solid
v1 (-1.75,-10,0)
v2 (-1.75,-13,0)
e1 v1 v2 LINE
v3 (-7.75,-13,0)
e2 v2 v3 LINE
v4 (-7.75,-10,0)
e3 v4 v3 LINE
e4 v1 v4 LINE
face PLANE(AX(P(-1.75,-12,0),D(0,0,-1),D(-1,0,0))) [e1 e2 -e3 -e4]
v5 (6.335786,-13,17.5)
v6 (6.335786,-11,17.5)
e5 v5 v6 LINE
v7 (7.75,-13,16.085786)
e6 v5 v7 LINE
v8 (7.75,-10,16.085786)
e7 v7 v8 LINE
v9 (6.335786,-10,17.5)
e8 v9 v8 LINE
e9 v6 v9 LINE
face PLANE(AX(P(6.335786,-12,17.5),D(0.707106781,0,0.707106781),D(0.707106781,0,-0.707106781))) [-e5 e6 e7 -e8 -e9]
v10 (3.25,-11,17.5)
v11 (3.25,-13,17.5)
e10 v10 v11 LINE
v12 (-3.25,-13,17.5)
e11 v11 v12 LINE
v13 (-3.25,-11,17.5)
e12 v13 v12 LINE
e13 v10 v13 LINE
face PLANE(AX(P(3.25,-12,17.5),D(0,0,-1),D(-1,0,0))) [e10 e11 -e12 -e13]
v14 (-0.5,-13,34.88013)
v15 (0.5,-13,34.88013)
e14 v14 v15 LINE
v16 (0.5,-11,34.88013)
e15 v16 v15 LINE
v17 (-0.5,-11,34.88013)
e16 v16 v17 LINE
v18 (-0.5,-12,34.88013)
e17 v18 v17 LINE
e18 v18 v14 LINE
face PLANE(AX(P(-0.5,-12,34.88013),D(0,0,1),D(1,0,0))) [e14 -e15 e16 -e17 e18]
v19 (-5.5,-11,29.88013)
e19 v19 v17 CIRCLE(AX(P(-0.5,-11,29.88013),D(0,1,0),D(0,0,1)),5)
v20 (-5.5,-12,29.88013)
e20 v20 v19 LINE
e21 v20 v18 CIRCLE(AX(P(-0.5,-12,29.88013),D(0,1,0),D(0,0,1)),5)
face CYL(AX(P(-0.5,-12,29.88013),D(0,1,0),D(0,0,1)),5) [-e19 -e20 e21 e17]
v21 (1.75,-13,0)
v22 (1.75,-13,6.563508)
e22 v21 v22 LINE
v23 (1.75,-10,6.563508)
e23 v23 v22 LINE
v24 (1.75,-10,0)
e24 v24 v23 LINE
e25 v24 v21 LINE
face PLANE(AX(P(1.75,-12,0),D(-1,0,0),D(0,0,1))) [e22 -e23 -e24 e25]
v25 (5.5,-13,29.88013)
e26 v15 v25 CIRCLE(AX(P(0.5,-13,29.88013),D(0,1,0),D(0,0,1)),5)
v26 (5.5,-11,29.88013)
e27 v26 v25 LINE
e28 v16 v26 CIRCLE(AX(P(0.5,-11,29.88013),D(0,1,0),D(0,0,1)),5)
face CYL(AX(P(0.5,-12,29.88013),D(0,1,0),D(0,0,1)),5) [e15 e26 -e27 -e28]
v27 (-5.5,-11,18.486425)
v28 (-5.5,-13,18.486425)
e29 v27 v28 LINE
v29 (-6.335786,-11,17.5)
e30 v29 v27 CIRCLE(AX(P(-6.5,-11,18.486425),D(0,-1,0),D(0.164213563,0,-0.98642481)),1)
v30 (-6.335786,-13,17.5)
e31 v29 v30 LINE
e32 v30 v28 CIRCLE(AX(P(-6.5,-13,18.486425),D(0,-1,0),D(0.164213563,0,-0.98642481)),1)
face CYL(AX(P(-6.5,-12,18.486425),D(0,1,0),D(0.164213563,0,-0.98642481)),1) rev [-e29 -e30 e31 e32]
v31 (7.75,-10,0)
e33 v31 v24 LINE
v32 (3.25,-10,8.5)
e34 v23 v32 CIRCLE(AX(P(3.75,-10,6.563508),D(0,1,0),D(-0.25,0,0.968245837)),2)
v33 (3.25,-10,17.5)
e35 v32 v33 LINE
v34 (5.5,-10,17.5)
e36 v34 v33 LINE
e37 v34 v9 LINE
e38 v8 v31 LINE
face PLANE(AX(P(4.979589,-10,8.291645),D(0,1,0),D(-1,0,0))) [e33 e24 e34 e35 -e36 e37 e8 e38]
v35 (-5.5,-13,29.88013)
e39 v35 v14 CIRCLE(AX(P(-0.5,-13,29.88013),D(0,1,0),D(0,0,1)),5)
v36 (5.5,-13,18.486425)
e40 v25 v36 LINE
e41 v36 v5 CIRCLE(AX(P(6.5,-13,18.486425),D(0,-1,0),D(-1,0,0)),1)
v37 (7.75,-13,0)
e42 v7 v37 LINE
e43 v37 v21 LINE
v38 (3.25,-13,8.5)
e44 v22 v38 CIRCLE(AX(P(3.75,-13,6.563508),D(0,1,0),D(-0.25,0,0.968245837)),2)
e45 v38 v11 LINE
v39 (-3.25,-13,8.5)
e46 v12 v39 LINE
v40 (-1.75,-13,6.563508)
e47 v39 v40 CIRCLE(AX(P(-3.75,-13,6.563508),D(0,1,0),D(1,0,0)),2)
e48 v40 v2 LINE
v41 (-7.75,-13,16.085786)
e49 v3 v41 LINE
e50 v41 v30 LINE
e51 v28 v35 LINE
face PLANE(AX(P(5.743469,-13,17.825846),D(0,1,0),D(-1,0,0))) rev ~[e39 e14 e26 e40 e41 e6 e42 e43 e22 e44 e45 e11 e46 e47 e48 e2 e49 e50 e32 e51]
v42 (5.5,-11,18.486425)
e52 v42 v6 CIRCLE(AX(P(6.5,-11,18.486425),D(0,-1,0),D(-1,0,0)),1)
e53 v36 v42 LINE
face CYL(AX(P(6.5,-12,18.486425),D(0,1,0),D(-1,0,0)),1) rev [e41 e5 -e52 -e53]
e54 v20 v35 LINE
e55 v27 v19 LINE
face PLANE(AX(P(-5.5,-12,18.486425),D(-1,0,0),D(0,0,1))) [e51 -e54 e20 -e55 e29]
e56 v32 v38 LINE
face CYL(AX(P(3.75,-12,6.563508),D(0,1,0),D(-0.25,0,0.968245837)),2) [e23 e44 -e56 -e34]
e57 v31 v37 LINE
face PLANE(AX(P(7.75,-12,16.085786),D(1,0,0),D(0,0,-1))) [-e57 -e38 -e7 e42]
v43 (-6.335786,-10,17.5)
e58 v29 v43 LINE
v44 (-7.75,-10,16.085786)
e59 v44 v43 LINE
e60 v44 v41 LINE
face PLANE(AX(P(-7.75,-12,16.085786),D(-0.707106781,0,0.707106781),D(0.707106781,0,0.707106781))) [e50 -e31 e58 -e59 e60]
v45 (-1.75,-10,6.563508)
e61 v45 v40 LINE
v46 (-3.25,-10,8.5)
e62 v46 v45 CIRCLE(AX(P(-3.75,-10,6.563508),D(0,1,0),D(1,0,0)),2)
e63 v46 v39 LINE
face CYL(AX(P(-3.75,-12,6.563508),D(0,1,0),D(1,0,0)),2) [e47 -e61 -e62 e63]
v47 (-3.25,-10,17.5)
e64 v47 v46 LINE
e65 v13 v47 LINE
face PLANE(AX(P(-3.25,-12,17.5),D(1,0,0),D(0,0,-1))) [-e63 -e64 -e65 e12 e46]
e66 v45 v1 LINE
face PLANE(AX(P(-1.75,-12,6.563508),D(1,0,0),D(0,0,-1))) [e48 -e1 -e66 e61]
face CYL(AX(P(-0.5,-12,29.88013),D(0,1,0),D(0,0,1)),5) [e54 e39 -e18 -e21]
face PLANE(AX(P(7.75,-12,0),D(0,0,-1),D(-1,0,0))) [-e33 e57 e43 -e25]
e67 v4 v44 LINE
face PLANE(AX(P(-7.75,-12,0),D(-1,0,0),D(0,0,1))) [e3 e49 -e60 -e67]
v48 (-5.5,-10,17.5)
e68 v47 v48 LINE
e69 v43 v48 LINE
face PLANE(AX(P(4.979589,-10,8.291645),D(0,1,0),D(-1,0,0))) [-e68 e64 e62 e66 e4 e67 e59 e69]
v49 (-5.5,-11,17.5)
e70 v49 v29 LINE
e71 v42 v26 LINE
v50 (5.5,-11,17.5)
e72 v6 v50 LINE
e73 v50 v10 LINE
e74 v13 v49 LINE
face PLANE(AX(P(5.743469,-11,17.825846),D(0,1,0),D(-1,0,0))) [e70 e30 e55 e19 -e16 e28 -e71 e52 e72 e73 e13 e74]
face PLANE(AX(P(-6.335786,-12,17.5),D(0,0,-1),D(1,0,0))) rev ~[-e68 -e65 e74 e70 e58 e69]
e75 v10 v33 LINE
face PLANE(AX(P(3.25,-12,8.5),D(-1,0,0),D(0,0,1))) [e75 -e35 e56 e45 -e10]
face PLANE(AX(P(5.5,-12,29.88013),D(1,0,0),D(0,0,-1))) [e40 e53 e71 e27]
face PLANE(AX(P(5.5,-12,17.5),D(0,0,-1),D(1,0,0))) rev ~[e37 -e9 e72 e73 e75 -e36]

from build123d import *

# Parameters (mm, degrees)
F3_DEPTH    = 2
F4_W        = 1
F4_H        = 17.3801295459
F5_DEPTH    = 13.251
F6_R        = 5
F7_T1_DEPTH = 1
F8_T1_DEPTH = 11.6824583655
F9_DEPTH    = 1


# Not quite as in the source:
# - a fillet or chamfer that OpenCascade refuses, or shapes differently, is made with other operations: its cross-section is extruded or revolved along the edge and cut away or added


with BuildPart() as f3:
    # F2 (on line) → F3 (new body)
    with BuildSketch(Plane(origin=(0, -12, 0), x_dir=(-1, 0, 0), z_dir=(0, 1, 0))):
        Polygon((-7.75, 0), (-1.75, 0), (-1.75, 8.5), (-3.25, 8.5), (-3.25, 17.5), (-5.5, 17.5), (-6.3357864376, 17.5), (-7.75, 16.0857864376), align=None)
        Polygon((5.5, 17.5), (3.25, 17.5), (3.25, 8.5), (1.75, 8.5), (1.75, 0), (7.75, 0), (7.75, 16.0857864376), (6.3357864376, 17.5), align=None)
        Polygon((-5.5, 17.5), (-3.25, 17.5), (3.25, 17.5), (5.5, 17.5), (5.5, 34.8801295459), (0, 34.8801295459), (-5.5, 34.8801295459), align=None)
    extrude(amount=F3_DEPTH)

    # F4 (on face) → F5 (cut, through all)
    with BuildSketch(Plane.YZ.offset(5.5)):
        with Locations((-10.5, 26.190064773)):
            Rectangle(F4_W, F4_H)
    extrude(amount=-F5_DEPTH, mode=Mode.SUBTRACT)

    # F6
    f6_edges = [f3.edges().sort_by_distance(p)[0] for p in [
        (5.5, -11.5, 34.88013),
        (-5.5, -11.5, 34.88013),
    ]]
    fillet(f6_edges, radius=F6_R)

    # F7: fillet of radius 1 on 2 edges, made by hand

    # F7_s2 → F7_t1 (join)
    with BuildSketch(Plane.XZ.offset(11)):
        with BuildLine():
            ThreePointArc((5.5, 18.4864248101), (5.7370407736, 17.8399782007), (6.3357864376, 17.5))
            Line((6.3357864376, 17.5), (5.5, 17.5))
            Line((5.5, 17.5), (5.5, 18.4864248101))
        make_face()
        with BuildLine():
            ThreePointArc((-6.3357864376, 17.5), (-5.7370407736, 17.8399782007), (-5.5, 18.4864248101))
            Line((-5.5, 18.4864248101), (-5.5, 17.5))
            Line((-5.5, 17.5), (-6.3357864376, 17.5))
        make_face()
    extrude(amount=F7_T1_DEPTH)

    # F8: fillet of radius 2 on 2 edges, made by hand

    # F8_s2 → F8_t1 (cut)
    with BuildSketch(Plane.XZ.offset(5.1587708172)):
        with BuildLine():
            ThreePointArc((3.25, 8.5), (2.1688611699, 7.7882531983), (1.75, 6.5635083269))
            Line((1.75, 6.5635083269), (1.75, 8.5))
            Line((1.75, 8.5), (3.25, 8.5))
        make_face()
        with BuildLine():
            ThreePointArc((-1.75, 6.5635083269), (-2.1688611699, 7.7882531983), (-3.25, 8.5))
            Line((-3.25, 8.5), (-1.75, 8.5))
            Line((-1.75, 8.5), (-1.75, 6.5635083269))
        make_face()
    extrude(amount=F8_T1_DEPTH, mode=Mode.SUBTRACT)

    # F9 (add): a face of the model
    f9_faces = [f3.faces().sort_by_distance(p)[0] for p in [
        (-5.4458267789, -12, 17.5932359202),
    ]]
    extrude(f9_faces, amount=F9_DEPTH)


solid = f3.part
